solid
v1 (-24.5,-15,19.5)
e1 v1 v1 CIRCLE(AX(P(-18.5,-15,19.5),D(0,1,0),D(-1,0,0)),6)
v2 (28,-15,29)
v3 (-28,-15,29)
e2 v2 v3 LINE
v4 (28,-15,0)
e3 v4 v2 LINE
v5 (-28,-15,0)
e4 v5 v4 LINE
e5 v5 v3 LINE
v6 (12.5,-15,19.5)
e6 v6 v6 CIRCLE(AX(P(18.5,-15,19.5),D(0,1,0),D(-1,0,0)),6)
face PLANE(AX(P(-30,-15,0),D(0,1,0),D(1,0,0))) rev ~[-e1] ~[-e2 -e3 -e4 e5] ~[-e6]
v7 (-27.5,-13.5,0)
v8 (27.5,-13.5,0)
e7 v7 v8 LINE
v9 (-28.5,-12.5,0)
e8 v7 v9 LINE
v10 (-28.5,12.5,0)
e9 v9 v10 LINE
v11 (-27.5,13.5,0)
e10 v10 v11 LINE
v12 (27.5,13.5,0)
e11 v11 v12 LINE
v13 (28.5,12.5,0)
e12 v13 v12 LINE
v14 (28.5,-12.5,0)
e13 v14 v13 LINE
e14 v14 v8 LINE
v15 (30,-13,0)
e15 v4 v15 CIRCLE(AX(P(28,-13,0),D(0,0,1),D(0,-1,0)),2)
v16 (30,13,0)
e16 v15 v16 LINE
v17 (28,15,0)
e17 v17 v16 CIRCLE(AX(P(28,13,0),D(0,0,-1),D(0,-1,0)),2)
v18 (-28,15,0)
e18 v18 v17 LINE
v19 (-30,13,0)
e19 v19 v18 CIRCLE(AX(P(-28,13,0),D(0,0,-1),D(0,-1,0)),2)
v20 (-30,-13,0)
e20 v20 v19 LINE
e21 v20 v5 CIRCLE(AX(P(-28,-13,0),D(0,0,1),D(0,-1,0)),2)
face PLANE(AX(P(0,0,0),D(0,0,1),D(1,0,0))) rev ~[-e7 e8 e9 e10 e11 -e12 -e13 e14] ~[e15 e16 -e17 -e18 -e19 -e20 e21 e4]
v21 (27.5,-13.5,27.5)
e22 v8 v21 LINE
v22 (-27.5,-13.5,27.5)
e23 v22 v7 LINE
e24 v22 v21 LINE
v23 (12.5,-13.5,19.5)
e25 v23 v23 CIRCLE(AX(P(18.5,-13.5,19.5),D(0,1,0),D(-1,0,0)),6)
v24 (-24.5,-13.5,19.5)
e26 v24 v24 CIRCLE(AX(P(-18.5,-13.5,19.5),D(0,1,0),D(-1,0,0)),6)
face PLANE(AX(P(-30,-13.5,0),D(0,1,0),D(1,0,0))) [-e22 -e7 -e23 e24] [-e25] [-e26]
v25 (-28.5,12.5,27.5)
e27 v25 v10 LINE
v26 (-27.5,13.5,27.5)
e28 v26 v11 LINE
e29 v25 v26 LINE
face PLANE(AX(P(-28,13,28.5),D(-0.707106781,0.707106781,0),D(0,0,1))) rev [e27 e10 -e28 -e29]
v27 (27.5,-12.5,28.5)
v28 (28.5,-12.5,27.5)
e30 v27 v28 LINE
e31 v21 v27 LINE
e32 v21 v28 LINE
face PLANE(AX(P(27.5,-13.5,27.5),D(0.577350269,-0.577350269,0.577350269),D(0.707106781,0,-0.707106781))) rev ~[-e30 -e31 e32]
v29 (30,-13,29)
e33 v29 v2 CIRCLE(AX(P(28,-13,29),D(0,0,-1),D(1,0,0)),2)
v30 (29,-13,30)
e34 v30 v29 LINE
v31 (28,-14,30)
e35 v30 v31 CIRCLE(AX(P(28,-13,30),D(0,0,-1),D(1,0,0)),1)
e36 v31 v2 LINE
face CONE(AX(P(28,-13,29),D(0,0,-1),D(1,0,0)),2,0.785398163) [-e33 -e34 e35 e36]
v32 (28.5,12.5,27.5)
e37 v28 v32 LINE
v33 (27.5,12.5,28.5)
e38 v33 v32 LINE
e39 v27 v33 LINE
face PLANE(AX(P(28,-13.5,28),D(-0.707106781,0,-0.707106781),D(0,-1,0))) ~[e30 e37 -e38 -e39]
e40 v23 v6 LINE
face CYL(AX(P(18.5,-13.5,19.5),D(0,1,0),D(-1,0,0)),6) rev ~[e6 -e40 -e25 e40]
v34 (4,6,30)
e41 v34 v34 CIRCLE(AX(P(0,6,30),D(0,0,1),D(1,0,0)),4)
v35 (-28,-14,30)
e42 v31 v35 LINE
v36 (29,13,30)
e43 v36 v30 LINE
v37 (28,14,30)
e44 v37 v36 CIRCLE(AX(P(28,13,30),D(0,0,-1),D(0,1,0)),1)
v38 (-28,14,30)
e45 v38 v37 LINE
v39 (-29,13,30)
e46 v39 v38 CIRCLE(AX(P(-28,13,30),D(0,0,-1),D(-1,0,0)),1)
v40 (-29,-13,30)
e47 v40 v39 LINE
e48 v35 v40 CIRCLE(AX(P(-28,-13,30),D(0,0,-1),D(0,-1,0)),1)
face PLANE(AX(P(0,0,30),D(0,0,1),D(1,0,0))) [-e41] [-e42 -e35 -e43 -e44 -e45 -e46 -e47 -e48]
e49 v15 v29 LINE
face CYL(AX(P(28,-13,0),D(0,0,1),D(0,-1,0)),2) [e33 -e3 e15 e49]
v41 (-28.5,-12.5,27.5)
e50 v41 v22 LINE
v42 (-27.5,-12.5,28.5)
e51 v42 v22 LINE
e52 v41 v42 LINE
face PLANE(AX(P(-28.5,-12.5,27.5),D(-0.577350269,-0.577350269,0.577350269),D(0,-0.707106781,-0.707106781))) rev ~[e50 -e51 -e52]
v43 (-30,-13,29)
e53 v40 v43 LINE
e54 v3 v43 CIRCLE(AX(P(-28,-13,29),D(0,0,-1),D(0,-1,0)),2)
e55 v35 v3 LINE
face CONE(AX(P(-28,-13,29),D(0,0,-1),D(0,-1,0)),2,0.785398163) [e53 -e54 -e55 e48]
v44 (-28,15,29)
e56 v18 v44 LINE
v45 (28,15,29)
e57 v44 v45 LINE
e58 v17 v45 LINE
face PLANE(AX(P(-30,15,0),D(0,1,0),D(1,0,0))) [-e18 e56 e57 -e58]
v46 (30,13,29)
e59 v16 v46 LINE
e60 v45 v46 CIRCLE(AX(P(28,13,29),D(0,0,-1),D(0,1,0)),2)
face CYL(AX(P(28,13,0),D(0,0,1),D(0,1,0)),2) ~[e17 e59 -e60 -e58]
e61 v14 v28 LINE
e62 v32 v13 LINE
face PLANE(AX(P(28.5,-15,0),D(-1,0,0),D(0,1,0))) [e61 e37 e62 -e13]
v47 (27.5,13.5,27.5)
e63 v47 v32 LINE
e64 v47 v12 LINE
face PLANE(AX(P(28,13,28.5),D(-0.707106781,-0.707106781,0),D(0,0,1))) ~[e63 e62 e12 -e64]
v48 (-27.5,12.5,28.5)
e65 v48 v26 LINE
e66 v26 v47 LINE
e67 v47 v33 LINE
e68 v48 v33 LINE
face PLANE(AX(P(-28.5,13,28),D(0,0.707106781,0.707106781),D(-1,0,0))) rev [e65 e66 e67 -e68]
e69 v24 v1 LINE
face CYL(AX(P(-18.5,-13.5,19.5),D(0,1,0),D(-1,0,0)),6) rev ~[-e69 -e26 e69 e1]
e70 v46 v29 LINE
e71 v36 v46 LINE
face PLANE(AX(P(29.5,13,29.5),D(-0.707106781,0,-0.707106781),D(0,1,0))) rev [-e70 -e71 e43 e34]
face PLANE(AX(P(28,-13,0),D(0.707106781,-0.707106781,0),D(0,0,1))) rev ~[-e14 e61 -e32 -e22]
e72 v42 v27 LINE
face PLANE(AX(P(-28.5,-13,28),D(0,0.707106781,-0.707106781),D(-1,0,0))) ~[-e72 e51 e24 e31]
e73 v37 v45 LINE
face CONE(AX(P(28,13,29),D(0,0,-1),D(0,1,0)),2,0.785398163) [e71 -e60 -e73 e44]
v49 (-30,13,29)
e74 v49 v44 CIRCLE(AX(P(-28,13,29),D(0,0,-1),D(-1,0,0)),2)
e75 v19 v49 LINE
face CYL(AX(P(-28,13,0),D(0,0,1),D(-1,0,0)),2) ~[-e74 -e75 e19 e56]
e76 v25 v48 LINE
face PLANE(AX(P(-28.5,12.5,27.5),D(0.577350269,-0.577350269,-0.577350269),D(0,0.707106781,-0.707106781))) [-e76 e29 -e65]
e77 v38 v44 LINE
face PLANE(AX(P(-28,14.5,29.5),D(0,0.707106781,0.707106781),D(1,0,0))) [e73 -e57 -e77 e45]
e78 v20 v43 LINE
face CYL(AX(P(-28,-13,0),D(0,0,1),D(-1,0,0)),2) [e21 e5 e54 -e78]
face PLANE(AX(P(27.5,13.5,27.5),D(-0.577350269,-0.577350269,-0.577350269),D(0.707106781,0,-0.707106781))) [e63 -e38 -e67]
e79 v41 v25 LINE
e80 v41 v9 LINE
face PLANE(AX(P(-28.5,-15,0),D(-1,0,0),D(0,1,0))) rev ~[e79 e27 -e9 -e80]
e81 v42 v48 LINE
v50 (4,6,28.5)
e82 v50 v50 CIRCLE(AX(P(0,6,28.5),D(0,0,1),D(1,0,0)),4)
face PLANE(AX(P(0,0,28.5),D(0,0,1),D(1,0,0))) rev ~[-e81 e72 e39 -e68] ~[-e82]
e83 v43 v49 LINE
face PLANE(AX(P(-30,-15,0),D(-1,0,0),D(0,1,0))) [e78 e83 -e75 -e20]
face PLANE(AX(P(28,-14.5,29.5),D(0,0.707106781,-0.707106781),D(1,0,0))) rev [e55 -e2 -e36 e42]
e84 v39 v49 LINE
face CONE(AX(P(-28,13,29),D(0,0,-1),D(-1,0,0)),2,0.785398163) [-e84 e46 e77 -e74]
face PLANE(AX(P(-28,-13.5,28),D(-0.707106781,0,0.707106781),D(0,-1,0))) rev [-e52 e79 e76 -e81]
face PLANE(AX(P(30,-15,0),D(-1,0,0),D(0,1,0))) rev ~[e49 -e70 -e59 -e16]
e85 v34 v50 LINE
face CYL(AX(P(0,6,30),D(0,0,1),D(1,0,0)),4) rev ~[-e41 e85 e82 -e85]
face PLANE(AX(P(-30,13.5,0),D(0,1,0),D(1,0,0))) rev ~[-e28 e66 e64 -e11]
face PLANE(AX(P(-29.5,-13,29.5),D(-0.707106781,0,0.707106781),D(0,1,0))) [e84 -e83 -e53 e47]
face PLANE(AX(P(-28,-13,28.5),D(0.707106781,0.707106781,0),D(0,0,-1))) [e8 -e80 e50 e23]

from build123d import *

# Parameters (mm, degrees)
F0_W     = 60
F0_H     = 30
F1_DEPTH = 30
F2_T     = -1.5
F3_R     = 6
F4_DEPTH = 1.501
F5_R     = 4
F6_DEPTH = 30.001
F7_R     = 2
F8_SIZE  = 1


with BuildPart() as f1:
    # F0 (on Top) → F1 (new body)
    with BuildSketch(Plane.XY):
        Rectangle(F0_W, F0_H)
    extrude(amount=F1_DEPTH)

    # F2
    f2_openings = [f1.faces().sort_by_distance(p)[0] for p in [
        (0, 0, 0),
    ]]
    offset(amount=F2_T, openings=f2_openings)

    # F3 (on face) → F4 (cut, through all)
    with BuildSketch(Plane(origin=(0, -13.5, 0), x_dir=(-1, 0, 0), z_dir=(0, 1, 0))):
        with Locations((-18.5, 19.5)):
            Circle(F3_R)
        with Locations((18.5, 19.5)):
            Circle(F3_R)
    extrude(amount=-F4_DEPTH, mode=Mode.SUBTRACT)

    # F5 (on face) → F6 (cut, through all)
    with BuildSketch(Plane.XY.offset(30)):
        with Locations((0, 6)):
            Circle(F5_R)
    extrude(amount=-F6_DEPTH, mode=Mode.SUBTRACT)

    # F7
    f7_edges = [f1.edges().sort_by_distance(p)[0] for p in [
        (30, 15, 15),
        (30, -15, 15),
        (-30, -15, 15),
        (-30, 15, 15),
    ]]
    fillet(f7_edges, radius=F7_R)

    # F8
    f8_edges = [f1.edges().sort_by_distance(p)[0] for p in [
        (28.5, 0, 28.5),
        (0, 13.5, 28.5),
        (0, -13.5, 28.5),
        (-28.5, 0, 28.5),
        (28.5, -13.5, 14.25),
        (28.5, 13.5, 14.25),
        (-28.5, -13.5, 14.25),
        (-28.5, 13.5, 14.25),
        (0, 15, 30),
        (30, 0, 30),
        (-30, 0, 30),
        (0, -15, 30),
    ]]
    chamfer(f8_edges, length=F8_SIZE)


solid = f1.part
